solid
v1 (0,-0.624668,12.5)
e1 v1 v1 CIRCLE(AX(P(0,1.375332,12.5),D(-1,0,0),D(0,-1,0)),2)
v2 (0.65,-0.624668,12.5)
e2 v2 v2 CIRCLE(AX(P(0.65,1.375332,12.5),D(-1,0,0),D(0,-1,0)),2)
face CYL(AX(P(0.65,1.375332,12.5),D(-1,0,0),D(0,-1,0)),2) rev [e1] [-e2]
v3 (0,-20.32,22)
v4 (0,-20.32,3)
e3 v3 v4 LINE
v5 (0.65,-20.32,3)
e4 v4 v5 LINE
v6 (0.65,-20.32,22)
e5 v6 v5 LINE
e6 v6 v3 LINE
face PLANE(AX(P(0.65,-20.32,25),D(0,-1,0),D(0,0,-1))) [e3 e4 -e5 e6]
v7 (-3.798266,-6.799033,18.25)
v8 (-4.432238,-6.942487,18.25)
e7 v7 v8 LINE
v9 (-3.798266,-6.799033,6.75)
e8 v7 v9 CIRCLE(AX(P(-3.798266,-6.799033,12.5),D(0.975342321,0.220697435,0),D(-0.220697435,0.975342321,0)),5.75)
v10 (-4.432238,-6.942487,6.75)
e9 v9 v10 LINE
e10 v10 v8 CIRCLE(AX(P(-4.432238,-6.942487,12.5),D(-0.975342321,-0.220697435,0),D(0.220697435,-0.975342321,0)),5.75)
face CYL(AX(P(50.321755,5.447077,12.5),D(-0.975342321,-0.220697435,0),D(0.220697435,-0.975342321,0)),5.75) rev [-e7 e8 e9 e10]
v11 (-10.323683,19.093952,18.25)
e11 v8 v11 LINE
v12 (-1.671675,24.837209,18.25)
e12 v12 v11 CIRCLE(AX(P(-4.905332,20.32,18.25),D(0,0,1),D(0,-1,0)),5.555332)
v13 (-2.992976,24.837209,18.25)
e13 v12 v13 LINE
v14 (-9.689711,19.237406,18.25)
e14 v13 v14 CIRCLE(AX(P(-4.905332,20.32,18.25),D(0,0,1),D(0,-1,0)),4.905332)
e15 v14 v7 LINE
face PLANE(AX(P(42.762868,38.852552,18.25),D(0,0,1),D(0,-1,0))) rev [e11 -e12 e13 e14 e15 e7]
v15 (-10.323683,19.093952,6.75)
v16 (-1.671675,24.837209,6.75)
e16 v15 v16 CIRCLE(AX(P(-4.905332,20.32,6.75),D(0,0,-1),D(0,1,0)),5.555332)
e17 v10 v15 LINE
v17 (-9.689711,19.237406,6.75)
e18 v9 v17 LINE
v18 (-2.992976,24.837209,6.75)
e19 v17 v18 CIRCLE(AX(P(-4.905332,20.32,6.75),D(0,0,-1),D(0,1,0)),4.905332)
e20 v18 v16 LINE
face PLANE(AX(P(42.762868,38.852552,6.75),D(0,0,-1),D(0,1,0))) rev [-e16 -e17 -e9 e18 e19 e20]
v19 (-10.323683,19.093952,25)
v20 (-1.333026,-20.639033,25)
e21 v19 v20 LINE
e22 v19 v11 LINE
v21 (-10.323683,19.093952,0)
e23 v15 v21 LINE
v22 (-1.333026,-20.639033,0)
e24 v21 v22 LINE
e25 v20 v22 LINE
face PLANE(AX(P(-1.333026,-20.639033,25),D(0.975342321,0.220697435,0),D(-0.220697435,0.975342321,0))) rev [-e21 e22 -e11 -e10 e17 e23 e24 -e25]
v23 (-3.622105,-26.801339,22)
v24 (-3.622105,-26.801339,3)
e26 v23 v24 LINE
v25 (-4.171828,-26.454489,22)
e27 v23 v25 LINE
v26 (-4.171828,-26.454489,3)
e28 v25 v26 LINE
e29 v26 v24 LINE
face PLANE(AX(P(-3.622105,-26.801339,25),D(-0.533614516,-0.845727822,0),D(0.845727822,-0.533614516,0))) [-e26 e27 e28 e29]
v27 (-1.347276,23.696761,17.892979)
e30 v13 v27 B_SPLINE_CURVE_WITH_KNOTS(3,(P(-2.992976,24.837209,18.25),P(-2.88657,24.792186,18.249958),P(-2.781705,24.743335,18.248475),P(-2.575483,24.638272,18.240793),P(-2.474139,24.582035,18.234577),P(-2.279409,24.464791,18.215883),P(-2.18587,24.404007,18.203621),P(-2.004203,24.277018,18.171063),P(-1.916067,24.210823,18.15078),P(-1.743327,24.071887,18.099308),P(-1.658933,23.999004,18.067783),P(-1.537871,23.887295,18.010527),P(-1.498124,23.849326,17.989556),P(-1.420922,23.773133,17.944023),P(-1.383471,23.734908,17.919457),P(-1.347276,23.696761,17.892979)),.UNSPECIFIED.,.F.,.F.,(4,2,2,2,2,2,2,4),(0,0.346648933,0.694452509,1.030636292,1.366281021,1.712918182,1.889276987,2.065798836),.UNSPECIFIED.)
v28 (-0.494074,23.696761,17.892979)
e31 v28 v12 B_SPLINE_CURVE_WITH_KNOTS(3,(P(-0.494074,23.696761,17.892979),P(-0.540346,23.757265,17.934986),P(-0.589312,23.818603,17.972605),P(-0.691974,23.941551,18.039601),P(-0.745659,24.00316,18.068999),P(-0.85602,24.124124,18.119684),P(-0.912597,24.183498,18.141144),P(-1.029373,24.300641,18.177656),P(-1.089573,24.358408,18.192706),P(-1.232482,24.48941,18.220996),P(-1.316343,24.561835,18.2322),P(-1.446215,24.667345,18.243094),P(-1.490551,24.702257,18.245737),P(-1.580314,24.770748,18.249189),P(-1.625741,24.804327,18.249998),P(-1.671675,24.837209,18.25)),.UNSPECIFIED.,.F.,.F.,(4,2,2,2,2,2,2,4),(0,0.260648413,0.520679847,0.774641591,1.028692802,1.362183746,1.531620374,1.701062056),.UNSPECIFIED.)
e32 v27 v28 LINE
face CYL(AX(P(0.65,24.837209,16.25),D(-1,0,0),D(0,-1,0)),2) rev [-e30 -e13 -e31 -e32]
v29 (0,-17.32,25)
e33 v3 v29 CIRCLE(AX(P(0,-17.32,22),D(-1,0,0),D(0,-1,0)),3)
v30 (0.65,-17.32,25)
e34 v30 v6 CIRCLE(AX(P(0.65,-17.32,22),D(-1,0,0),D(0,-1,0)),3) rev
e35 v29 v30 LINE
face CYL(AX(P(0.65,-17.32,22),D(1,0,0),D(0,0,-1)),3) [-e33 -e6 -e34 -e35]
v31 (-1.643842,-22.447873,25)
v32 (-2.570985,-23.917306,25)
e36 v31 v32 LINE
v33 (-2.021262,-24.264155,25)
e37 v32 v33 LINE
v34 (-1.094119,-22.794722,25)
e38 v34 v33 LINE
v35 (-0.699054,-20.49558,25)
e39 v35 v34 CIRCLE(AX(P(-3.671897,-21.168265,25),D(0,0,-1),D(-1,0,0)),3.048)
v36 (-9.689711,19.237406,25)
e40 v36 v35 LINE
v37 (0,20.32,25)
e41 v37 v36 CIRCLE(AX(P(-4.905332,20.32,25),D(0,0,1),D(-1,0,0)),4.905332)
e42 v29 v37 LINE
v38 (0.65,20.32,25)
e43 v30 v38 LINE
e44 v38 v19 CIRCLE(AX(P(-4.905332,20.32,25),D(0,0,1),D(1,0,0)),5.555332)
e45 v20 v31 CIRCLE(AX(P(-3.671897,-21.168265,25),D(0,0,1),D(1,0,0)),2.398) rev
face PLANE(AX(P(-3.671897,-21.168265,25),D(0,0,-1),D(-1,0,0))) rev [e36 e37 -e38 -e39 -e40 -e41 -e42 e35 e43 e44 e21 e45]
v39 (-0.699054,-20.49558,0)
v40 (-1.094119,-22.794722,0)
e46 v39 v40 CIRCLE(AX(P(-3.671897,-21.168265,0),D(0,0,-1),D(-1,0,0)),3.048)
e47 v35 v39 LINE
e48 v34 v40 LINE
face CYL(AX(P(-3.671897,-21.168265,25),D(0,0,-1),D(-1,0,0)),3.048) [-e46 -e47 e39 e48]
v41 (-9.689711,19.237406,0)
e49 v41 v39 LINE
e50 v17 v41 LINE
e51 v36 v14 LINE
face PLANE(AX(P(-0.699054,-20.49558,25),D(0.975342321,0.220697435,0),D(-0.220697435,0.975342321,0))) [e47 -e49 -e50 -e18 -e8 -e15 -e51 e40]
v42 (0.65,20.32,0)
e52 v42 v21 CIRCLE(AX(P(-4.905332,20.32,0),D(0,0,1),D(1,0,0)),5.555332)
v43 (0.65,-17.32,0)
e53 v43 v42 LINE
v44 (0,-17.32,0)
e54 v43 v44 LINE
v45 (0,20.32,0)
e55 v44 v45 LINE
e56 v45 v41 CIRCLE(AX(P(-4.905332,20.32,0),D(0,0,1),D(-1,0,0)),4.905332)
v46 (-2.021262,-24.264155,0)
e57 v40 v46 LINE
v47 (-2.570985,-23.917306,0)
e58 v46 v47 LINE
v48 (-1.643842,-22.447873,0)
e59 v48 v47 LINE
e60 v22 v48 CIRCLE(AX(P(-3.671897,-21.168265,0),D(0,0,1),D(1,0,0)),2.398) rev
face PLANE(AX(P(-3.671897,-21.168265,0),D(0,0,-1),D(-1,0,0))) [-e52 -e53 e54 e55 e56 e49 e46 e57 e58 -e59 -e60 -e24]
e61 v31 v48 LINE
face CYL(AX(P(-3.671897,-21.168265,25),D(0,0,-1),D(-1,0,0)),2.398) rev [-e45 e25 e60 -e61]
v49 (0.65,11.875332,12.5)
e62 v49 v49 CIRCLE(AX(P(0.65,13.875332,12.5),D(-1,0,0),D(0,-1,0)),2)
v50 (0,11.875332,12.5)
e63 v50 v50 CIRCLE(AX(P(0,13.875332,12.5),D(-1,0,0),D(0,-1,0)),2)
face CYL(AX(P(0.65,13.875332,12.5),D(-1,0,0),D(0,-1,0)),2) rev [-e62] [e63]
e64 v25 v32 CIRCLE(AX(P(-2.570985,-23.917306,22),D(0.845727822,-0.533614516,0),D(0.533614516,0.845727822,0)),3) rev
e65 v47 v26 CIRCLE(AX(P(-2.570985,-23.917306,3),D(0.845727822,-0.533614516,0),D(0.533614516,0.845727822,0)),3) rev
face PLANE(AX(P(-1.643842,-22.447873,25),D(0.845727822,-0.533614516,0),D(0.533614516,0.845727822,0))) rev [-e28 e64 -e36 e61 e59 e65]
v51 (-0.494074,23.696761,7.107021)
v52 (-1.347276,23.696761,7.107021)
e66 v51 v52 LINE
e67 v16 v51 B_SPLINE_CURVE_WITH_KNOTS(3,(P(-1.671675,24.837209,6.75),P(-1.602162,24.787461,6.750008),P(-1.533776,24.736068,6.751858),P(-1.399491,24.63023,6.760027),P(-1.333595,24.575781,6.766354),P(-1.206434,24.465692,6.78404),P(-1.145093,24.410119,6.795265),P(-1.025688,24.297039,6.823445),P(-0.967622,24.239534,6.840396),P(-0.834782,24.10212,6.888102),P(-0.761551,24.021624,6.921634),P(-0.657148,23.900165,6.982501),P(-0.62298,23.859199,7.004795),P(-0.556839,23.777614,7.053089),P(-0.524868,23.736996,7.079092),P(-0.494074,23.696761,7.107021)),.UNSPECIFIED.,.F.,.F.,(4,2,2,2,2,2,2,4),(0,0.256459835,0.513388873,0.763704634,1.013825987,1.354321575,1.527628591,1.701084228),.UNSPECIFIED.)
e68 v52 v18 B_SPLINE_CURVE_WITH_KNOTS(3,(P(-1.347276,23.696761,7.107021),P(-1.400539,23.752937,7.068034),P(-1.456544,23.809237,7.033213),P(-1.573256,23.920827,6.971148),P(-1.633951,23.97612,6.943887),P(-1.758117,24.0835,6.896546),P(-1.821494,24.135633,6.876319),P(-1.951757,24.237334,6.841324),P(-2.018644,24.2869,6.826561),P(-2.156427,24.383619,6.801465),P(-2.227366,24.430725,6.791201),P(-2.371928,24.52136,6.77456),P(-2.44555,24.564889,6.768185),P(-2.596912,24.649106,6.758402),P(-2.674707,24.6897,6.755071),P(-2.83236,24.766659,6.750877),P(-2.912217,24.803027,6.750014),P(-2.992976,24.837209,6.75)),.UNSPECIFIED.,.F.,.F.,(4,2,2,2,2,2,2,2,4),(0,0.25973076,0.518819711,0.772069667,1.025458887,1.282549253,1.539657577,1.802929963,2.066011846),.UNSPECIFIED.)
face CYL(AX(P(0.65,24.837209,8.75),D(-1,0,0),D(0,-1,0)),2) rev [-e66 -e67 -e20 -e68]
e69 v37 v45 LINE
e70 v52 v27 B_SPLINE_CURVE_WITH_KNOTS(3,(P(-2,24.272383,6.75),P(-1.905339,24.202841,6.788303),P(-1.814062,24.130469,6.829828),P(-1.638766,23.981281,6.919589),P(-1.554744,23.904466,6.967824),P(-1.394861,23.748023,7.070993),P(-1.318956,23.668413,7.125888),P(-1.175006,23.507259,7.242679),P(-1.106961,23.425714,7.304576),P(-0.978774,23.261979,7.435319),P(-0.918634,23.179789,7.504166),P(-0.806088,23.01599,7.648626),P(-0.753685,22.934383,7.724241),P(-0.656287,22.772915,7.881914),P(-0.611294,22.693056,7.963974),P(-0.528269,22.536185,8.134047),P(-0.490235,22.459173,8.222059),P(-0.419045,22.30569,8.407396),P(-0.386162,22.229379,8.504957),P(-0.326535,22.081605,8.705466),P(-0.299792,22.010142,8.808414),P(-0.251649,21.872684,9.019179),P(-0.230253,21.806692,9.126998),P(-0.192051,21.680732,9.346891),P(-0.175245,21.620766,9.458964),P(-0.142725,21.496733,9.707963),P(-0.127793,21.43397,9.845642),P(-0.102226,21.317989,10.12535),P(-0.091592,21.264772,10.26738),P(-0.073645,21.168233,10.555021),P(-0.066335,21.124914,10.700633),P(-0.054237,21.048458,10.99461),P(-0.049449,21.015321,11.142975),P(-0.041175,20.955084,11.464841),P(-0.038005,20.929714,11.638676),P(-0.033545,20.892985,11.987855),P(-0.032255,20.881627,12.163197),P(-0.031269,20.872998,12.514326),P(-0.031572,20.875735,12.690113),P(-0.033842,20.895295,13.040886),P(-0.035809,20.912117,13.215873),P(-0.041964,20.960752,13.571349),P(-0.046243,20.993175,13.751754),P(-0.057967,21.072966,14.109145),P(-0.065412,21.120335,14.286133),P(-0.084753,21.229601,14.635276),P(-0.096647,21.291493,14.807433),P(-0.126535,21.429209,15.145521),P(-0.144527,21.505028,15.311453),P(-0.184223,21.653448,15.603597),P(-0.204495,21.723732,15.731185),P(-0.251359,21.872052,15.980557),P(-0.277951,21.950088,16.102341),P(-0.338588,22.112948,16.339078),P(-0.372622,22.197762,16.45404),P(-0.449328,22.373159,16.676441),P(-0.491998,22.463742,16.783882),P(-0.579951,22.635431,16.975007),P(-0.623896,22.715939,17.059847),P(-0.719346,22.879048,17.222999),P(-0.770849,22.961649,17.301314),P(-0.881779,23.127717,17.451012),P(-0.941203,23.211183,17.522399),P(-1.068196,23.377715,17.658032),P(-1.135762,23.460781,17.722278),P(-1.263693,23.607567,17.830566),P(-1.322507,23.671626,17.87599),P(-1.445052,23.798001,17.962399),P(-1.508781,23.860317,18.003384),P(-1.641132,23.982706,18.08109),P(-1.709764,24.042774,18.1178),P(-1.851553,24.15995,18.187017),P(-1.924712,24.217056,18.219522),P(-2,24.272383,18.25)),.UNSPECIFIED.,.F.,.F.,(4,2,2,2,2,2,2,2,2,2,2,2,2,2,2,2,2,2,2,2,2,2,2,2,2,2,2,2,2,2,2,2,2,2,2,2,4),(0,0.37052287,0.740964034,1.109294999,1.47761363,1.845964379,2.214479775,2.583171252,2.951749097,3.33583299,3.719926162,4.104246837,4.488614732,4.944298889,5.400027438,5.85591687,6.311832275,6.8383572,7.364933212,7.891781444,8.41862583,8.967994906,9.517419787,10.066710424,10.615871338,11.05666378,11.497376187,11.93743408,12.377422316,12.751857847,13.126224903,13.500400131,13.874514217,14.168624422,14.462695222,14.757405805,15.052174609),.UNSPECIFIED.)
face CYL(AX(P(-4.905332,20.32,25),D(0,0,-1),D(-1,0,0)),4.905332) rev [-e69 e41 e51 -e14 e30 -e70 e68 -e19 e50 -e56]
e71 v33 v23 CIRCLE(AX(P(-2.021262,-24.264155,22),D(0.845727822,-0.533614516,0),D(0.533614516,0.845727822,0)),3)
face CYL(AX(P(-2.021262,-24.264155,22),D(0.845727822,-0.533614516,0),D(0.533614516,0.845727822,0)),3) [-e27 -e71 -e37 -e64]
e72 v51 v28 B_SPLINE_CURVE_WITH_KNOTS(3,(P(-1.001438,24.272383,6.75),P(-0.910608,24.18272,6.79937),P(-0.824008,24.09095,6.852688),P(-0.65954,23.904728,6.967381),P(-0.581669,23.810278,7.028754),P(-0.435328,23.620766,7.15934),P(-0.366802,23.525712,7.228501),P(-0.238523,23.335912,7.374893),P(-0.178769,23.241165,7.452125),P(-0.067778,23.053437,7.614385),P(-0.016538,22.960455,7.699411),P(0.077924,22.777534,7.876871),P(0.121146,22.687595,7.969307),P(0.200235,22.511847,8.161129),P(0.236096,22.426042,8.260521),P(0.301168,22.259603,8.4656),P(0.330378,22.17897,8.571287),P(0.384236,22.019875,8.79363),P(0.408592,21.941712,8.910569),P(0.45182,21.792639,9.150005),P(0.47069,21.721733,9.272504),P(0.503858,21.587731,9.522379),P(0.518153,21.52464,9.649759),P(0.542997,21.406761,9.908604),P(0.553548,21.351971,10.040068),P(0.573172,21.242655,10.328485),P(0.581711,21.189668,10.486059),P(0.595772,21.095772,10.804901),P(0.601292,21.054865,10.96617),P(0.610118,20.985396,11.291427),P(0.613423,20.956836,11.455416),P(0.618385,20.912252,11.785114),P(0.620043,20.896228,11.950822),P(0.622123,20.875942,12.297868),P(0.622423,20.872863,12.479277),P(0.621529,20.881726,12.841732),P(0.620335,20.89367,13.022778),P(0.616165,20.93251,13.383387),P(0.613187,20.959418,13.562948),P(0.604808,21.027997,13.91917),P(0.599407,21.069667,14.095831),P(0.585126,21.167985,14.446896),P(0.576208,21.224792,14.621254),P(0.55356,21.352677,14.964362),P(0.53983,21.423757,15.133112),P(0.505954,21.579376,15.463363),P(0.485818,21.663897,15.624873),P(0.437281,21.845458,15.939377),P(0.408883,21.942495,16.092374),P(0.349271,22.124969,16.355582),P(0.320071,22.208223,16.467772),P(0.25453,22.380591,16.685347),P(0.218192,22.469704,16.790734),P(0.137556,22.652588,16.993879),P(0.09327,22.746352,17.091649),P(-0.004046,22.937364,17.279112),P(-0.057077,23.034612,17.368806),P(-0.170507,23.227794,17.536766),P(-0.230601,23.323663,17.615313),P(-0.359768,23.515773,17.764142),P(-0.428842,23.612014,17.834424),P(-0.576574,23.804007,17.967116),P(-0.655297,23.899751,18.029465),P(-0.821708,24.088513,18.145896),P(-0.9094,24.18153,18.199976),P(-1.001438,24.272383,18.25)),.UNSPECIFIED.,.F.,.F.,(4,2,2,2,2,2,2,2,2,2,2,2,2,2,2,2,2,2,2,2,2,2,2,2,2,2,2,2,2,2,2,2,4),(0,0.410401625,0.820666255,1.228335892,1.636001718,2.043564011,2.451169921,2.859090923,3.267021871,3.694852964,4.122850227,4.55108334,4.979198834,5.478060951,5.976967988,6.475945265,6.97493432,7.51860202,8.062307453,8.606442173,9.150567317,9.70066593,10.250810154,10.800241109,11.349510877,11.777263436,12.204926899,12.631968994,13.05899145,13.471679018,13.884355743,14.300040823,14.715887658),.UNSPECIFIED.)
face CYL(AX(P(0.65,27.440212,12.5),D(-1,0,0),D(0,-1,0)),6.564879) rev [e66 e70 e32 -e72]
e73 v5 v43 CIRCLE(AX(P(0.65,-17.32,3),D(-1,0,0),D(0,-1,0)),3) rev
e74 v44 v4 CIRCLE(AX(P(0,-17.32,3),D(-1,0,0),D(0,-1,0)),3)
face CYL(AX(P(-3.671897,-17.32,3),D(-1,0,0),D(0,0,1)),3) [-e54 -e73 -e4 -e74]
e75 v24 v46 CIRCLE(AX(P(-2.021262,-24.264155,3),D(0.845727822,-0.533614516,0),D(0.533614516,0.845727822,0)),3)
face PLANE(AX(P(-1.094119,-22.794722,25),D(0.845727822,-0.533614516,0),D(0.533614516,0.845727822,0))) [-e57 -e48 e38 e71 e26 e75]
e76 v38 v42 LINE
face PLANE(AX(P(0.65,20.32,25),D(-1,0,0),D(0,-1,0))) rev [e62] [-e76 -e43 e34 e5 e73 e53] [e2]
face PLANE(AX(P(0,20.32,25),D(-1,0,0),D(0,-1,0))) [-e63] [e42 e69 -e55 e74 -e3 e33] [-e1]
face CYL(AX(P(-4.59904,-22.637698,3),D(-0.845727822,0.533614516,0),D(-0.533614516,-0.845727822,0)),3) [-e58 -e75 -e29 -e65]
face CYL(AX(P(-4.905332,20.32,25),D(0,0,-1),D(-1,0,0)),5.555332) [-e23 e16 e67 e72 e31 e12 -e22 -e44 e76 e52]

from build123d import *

# Parameters (mm, degrees)
EXTRUDE_THIN1_DEPTH              = 25
CUT_EXTRUDE1_REACH               = 41.464
CUT_EXTRUDE1_OFFSET_FROM_SURFACE = 2
CUT_EXTRUDE2_DEPTH               = 39.114790536728684
CUT_EXTRUDE2_DEPTH_BACK          = 39.114790536728684
FILLET1_R                        = 2
FILLET2_R                        = 3
SKETCH4_R                        = 1.9999999999999996
CUT_EXTRUDE3_DEPTH               = 39.11479062976518


with BuildPart() as part:
    # Sketch1 → Extrude-Thin1 (new body)
    with BuildSketch(Plane.XY):
        with BuildLine():
            Line((-3.622105329640586, -26.801338649985606), (-1.0941188006005313, -22.79472249406353))
            ThreePointArc((-1.0941188006005313, -22.79472249406353), (-0.66792233314523, -21.684442737284584), (-0.6990538082442912, -20.49557966760723))
            Line((-0.6990538082442912, -20.49557966760723), (-9.68971050504969, 19.237405741595826))
            ThreePointArc((-9.68971050504969, 19.237405741595826), (-5.449997394886004, 25.195000000000007), (0, 20.320000000000004))
            Line((0, 20.320000000000004), (0, -20.320000000000004))
            Line((0, -20.320000000000004), (0.65, -20.320000000000004))
            Line((0.65, -20.320000000000004), (0.65, 20.320000000000004))
            ThreePointArc((0.6499999999999986, 20.320000000000004), (-5.52217034544628, 25.840980700336655), (-10.323683013380226, 19.093952408831854))
            Line((-10.323683013380226, 19.093952408831854), (-1.3330263165748255, -20.639033000371203))
            ThreePointArc((-1.3330263165748275, -20.639033000371192), (-1.3085337715329808, -21.57436555978272), (-1.6438418847081215, -22.4478730587184))
            Line((-1.6438418847081135, -22.447873058718383), (-4.171828413748168, -26.454489214640457))
            Line((-4.171828413748168, -26.454489214640457), (-3.622105329640586, -26.801338649985606))
        make_face()
    extrude(amount=EXTRUDE_THIN1_DEPTH)

    # Cut-Extrude1: up to this face of the body (flat: up to its plane, moved by the offset)
    cut_extrude1_end = Plane(part.part.faces().sort_by_distance((0, 0, 12.5))[0]).offset(CUT_EXTRUDE1_OFFSET_FROM_SURFACE)
    # Sketch2 → Cut-Extrude1 (cut, up to the picked face)
    with BuildSketch(Plane(origin=(-5.7107644938092665, -1.2922140763239114, 0), x_dir=(0, 0, 1), z_dir=(-0.9753423205085142, -0.22069743502149478, 0)), mode=Mode.PRIVATE) as cut_extrude1_sk1:
        with BuildLine():
            Line((18.249999999999996, 28.456882519592593), (18.25, -5.793117480407402))
            ThreePointArc((18.25, -5.793117480407402), (12.499999999999998, -11.5431174804074), (6.750000000000001, -5.793117480407404))
            Line((6.750000000000001, -5.793117480407404), (6.749999999999996, 28.456882519592593))
            ThreePointArc((6.749999999999996, 28.456882519592593), (12.499999999999995, 34.2068825195926), (18.249999999999996, 28.456882519592593))
        make_face()
    cut_extrude1_tool1 = split(extrude(cut_extrude1_sk1.sketch, amount=-CUT_EXTRUDE1_REACH, mode=Mode.PRIVATE), bisect_by=cut_extrude1_end, keep=Keep.BOTH, mode=Mode.PRIVATE)
    add(cut_extrude1_tool1.solids().sort_by(Axis((-8.211682, 9.760251, 12.5), (0.9753423205085142, 0.22069743502149478, 0)))[0], mode=Mode.SUBTRACT)

    # Sketch3 → Cut-Extrude2 (cut, two sides: drawn at the far end of the back side and taken through both)
    with BuildSketch(Plane.ZY.offset(-CUT_EXTRUDE2_DEPTH_BACK)):
        with BuildLine():
            Line((18.249999999999993, 24.27238272866149), (18.249999999999996, 25.05505662424576))
            Line((18.249999999999996, 25.05505662424576), (6.749999999999996, 25.05505662424576))
            Line((6.749999999999996, 25.05505662424576), (6.749999999999999, 24.27238272866149))
            ThreePointArc((6.749999999999999, 24.27238272866149), (12.499999999999995, 20.875332308455405), (18.249999999999993, 24.27238272866149))
        make_face()
    extrude(amount=CUT_EXTRUDE2_DEPTH + CUT_EXTRUDE2_DEPTH_BACK, mode=Mode.SUBTRACT)

    # Fillet1
    # the kernel refuses this fillet: 2 mm, written as the material it adds along each edge
    with BuildSketch(Plane(origin=(0.6919383663248766, 24.272382728661498, 18.25), x_dir=(0, -0.8498127825413853, -0.5270846560366448), z_dir=(-1, 0, 0))) as fillet1_piece_1_section:
        with BuildLine():
            CenterArc((0.5741727604103483, -1.997336805169661), FILLET1_R, 87.04285714004924, 34.765830441625596)
            Line((-0.47999655166291116, -0.29771124008687166), (0, 0))
            ThreePointArc((0, 0), (0.3386753487804471, 0.00874177622603999), (0.6773506975608955, 0))
        make_face()
    fillet1_piece_1 = extrude(amount=4.385315110227097, mode=Mode.PRIVATE)
    fillet1_piece_1 = fillet1_piece_1 & Plane(origin=(-4.905332308455408, 20.320000000000007, 18.185221139731127), x_dir=(1, -6.4e-16, 0), z_dir=(0, 0, -1)) * Cylinder(5.555332308455408, 12, mode=Mode.PRIVATE)
    fillet1_piece_1 = fillet1_piece_1 - Plane(origin=(-4.90533230845541, 20.320000000000007, 18.185221139731127), x_dir=(-0.9753423205085139, -0.220697435021496, 0), z_dir=(0, 0, -1)) * Cylinder(4.9053323084554075, 12, mode=Mode.PRIVATE)
    add(fillet1_piece_1)
    with BuildSketch(Plane(origin=(-3.6933767439022205, 24.272382728661498, 6.7499999999999964), x_dir=(0, 1, 0), z_dir=(1, 0, 0))) as fillet1_piece_2_section:
        with BuildLine():
            CenterArc((0.5648262317583601, 2), FILLET1_R, 235.23416955837342, 34.765830441626576)
            ThreePointArc((-0.5756212810506085, 0.35702115944001456), (-0.2924182966405411, 0.17108170654102572), (0, 0))
            Line((0, 0), (0.5648262317583601, 0))
        make_face()
    fillet1_piece_2 = extrude(amount=4.385315110227104, mode=Mode.PRIVATE)
    fillet1_piece_2 = fillet1_piece_2 - Plane(origin=(-4.90533230845541, 20.320000000000007, 6.814778786528934), x_dir=(-0.9753423205085139, -0.220697435021496, 0), z_dir=(0, 0, -1)) * Cylinder(4.9053323084554075, 12, mode=Mode.PRIVATE)
    fillet1_piece_2 = fillet1_piece_2 & Plane(origin=(-4.905332308455408, 20.320000000000007, 6.814778786528934), x_dir=(1, -6.4e-16, 0), z_dir=(0, 0, -1)) * Cylinder(5.555332308455408, 12, mode=Mode.PRIVATE)
    add(fillet1_piece_2)

    # Fillet2
    fillet2_edges = [part.edges().sort_by_distance(p)[0] for p in [
        (0.325, -20.320000000000004, 0),
        (-3.896966871694377, -26.62791393231303, 0),
        (0.325, -20.320000000000004, 25),
        (-3.896966871694377, -26.62791393231303, 25),
    ]]
    fillet(fillet2_edges, radius=FILLET2_R)

    # Sketch4 → Cut-Extrude3 (cut, through all)
    with BuildSketch(Plane.ZY):
        with Locations(Location((12.5, 13.875332308455407, 0), (0, 0, 270))):
            Circle(SKETCH4_R)
        with Locations(Location((12.5, 1.375332308455407, 0), (0, 0, 270))):
            Circle(SKETCH4_R)
    extrude(amount=-CUT_EXTRUDE3_DEPTH, mode=Mode.SUBTRACT)


solid = part.part
